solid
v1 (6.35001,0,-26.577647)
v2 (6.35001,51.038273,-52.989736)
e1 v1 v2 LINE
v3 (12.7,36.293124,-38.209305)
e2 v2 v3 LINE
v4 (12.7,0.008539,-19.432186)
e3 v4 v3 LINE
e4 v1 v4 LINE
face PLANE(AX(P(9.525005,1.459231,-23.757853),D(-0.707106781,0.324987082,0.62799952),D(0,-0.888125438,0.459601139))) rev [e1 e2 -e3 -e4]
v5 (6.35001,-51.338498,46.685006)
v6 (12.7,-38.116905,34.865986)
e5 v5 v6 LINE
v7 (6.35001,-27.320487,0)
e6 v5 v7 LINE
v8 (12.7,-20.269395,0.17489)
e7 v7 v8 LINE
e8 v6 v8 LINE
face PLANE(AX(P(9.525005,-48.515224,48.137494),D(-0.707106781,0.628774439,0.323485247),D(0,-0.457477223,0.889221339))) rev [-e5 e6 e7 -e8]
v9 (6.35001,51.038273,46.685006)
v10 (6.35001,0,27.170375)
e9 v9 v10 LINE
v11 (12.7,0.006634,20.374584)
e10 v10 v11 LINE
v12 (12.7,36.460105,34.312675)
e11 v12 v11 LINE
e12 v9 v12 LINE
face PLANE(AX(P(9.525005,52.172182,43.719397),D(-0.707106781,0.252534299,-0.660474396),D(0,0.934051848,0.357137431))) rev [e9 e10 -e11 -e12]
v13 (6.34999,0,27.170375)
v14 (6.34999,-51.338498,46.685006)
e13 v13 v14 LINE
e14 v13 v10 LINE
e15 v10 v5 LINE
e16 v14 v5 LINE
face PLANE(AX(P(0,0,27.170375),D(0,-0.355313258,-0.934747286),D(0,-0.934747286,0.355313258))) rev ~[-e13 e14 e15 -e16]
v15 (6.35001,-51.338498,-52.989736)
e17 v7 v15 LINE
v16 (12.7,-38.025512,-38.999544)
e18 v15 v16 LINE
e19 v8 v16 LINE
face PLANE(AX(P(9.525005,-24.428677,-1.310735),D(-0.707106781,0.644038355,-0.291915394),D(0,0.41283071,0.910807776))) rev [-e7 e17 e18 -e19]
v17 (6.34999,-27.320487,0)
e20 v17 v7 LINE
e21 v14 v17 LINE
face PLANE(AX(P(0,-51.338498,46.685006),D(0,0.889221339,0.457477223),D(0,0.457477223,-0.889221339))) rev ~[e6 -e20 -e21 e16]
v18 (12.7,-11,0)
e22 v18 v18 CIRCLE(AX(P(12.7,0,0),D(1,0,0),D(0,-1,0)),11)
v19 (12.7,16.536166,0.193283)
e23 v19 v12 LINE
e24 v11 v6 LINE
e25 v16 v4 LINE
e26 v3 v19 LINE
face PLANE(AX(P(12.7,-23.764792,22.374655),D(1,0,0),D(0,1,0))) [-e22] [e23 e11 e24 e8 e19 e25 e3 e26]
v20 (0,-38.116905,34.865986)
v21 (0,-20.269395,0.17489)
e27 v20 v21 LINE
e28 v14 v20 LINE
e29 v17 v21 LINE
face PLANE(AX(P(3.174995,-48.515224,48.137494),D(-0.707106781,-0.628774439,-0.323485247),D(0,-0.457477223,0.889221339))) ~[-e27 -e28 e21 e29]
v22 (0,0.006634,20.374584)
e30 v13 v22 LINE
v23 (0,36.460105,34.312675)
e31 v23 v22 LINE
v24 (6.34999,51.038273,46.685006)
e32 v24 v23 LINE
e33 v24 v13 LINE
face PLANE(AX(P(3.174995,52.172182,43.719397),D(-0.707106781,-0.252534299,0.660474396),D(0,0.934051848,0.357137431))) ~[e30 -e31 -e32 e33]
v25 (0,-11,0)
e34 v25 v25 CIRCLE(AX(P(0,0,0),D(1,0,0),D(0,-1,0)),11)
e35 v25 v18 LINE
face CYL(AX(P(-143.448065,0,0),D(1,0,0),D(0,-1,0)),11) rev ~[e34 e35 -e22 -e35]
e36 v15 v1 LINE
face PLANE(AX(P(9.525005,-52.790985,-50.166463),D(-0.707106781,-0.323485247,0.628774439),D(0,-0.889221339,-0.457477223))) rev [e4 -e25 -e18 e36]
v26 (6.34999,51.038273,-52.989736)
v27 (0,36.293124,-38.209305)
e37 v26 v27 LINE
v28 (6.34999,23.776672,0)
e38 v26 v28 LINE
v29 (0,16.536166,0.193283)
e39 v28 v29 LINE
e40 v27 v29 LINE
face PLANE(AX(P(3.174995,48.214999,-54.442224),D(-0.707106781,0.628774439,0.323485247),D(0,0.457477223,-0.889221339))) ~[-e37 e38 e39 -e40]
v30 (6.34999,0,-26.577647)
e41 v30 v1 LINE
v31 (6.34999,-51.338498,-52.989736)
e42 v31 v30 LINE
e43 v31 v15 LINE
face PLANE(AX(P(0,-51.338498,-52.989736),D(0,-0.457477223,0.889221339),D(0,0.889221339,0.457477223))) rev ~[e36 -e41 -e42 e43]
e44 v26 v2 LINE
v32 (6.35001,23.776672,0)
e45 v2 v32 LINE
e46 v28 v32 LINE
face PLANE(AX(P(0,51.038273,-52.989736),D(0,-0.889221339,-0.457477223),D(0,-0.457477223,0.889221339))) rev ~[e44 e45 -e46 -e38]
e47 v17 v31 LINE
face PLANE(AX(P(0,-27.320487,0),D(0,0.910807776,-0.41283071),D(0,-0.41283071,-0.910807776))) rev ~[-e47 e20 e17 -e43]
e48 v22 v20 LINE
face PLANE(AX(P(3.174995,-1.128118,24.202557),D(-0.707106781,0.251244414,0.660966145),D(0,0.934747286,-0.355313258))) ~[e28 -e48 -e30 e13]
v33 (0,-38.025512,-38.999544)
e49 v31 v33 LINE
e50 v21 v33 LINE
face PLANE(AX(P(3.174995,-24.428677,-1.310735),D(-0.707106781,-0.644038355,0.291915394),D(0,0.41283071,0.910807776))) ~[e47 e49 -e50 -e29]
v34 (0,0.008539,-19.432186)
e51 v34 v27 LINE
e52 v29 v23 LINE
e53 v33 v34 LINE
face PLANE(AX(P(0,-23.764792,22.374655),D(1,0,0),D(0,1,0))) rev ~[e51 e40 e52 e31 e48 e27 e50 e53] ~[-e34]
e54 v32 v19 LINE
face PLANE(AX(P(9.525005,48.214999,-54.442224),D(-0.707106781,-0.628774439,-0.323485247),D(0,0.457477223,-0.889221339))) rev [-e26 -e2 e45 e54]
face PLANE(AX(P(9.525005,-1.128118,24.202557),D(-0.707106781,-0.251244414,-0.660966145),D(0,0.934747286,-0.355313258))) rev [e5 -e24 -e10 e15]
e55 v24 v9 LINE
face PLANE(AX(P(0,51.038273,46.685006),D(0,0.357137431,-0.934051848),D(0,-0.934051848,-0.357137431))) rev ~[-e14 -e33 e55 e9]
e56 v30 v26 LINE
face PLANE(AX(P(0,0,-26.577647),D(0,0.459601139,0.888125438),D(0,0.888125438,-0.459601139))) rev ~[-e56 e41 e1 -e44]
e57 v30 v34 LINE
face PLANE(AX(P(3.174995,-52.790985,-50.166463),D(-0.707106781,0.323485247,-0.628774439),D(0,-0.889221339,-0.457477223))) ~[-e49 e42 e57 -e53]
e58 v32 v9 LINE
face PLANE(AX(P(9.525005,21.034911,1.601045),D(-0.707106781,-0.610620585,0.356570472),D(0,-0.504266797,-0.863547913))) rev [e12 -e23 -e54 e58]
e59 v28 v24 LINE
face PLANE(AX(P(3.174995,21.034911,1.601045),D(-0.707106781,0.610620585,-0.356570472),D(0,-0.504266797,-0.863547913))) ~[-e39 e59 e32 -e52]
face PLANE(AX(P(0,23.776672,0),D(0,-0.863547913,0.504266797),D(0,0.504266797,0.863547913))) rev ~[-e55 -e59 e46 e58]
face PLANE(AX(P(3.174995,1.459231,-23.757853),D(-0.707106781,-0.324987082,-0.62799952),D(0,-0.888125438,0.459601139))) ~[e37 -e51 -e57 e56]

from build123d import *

# Parameters (mm, degrees)
F1_DEPTH = 12.7
F2_SIZE  = 6.34999
F4_D     = 22


# Not quite as in the source:
# - a fillet or chamfer is up to 0.001 mm smaller than in the source, because OpenCascade refuses the exact size


with BuildPart() as f1:
    # F0 (on Right) → F1 (new body)
    with BuildSketch(Plane.YZ):
        Polygon((0, 27.1703749895), (-51.3384975493, 46.6850064695), (-27.3204874247, 0), (0, 0), align=None)
        Polygon((0, 0), (-27.3204874247, 0), (-51.3384975493, -52.9897361994), (0, -26.5776470263), align=None)
        Polygon((23.7766716471, 0), (0, 0), (0, -26.5776470263), (51.0382726789, -52.9897361994), align=None)
        Polygon((51.0382726789, 46.6850064695), (0, 27.1703749895), (0, 0), (23.7766716471, 0), align=None)
    extrude(amount=F1_DEPTH)

    # F2 (size 6.35 in the source; OpenCascade refuses exactly that, so slightly less here)
    f2_edges = [f1.edges().sort_by_distance(p)[0] for p in [
        (12.7, -39.329492, 23.342503),
        (0, -39.329492, 23.342503),
        (0, -25.669249, 36.927691),
        (12.7, -25.669249, 36.927691),
        (0, -39.329492, -26.494868),
        (0, -25.669249, -39.783692),
        (12.7, -25.669249, -39.783692),
        (12.7, -39.329492, -26.494868),
        (0, 25.519136, -39.783692),
        (12.7, 25.519136, -39.783692),
        (0, 37.407472, -26.494868),
        (12.7, 37.407472, -26.494868),
        (0, 37.407472, 23.342503),
        (12.7, 37.407472, 23.342503),
        (0, 25.519136, 36.927691),
        (12.7, 25.519136, 36.927691),
    ]]
    chamfer(f2_edges, length=F2_SIZE)

    # F4 (through all)
    with Locations(Plane(origin=(0, 0, 0), x_dir=(0, 1, 0), z_dir=(-1, 0, 0))):
        with Locations((0, 0)):
            Hole(F4_D / 2)


solid = f1.part
